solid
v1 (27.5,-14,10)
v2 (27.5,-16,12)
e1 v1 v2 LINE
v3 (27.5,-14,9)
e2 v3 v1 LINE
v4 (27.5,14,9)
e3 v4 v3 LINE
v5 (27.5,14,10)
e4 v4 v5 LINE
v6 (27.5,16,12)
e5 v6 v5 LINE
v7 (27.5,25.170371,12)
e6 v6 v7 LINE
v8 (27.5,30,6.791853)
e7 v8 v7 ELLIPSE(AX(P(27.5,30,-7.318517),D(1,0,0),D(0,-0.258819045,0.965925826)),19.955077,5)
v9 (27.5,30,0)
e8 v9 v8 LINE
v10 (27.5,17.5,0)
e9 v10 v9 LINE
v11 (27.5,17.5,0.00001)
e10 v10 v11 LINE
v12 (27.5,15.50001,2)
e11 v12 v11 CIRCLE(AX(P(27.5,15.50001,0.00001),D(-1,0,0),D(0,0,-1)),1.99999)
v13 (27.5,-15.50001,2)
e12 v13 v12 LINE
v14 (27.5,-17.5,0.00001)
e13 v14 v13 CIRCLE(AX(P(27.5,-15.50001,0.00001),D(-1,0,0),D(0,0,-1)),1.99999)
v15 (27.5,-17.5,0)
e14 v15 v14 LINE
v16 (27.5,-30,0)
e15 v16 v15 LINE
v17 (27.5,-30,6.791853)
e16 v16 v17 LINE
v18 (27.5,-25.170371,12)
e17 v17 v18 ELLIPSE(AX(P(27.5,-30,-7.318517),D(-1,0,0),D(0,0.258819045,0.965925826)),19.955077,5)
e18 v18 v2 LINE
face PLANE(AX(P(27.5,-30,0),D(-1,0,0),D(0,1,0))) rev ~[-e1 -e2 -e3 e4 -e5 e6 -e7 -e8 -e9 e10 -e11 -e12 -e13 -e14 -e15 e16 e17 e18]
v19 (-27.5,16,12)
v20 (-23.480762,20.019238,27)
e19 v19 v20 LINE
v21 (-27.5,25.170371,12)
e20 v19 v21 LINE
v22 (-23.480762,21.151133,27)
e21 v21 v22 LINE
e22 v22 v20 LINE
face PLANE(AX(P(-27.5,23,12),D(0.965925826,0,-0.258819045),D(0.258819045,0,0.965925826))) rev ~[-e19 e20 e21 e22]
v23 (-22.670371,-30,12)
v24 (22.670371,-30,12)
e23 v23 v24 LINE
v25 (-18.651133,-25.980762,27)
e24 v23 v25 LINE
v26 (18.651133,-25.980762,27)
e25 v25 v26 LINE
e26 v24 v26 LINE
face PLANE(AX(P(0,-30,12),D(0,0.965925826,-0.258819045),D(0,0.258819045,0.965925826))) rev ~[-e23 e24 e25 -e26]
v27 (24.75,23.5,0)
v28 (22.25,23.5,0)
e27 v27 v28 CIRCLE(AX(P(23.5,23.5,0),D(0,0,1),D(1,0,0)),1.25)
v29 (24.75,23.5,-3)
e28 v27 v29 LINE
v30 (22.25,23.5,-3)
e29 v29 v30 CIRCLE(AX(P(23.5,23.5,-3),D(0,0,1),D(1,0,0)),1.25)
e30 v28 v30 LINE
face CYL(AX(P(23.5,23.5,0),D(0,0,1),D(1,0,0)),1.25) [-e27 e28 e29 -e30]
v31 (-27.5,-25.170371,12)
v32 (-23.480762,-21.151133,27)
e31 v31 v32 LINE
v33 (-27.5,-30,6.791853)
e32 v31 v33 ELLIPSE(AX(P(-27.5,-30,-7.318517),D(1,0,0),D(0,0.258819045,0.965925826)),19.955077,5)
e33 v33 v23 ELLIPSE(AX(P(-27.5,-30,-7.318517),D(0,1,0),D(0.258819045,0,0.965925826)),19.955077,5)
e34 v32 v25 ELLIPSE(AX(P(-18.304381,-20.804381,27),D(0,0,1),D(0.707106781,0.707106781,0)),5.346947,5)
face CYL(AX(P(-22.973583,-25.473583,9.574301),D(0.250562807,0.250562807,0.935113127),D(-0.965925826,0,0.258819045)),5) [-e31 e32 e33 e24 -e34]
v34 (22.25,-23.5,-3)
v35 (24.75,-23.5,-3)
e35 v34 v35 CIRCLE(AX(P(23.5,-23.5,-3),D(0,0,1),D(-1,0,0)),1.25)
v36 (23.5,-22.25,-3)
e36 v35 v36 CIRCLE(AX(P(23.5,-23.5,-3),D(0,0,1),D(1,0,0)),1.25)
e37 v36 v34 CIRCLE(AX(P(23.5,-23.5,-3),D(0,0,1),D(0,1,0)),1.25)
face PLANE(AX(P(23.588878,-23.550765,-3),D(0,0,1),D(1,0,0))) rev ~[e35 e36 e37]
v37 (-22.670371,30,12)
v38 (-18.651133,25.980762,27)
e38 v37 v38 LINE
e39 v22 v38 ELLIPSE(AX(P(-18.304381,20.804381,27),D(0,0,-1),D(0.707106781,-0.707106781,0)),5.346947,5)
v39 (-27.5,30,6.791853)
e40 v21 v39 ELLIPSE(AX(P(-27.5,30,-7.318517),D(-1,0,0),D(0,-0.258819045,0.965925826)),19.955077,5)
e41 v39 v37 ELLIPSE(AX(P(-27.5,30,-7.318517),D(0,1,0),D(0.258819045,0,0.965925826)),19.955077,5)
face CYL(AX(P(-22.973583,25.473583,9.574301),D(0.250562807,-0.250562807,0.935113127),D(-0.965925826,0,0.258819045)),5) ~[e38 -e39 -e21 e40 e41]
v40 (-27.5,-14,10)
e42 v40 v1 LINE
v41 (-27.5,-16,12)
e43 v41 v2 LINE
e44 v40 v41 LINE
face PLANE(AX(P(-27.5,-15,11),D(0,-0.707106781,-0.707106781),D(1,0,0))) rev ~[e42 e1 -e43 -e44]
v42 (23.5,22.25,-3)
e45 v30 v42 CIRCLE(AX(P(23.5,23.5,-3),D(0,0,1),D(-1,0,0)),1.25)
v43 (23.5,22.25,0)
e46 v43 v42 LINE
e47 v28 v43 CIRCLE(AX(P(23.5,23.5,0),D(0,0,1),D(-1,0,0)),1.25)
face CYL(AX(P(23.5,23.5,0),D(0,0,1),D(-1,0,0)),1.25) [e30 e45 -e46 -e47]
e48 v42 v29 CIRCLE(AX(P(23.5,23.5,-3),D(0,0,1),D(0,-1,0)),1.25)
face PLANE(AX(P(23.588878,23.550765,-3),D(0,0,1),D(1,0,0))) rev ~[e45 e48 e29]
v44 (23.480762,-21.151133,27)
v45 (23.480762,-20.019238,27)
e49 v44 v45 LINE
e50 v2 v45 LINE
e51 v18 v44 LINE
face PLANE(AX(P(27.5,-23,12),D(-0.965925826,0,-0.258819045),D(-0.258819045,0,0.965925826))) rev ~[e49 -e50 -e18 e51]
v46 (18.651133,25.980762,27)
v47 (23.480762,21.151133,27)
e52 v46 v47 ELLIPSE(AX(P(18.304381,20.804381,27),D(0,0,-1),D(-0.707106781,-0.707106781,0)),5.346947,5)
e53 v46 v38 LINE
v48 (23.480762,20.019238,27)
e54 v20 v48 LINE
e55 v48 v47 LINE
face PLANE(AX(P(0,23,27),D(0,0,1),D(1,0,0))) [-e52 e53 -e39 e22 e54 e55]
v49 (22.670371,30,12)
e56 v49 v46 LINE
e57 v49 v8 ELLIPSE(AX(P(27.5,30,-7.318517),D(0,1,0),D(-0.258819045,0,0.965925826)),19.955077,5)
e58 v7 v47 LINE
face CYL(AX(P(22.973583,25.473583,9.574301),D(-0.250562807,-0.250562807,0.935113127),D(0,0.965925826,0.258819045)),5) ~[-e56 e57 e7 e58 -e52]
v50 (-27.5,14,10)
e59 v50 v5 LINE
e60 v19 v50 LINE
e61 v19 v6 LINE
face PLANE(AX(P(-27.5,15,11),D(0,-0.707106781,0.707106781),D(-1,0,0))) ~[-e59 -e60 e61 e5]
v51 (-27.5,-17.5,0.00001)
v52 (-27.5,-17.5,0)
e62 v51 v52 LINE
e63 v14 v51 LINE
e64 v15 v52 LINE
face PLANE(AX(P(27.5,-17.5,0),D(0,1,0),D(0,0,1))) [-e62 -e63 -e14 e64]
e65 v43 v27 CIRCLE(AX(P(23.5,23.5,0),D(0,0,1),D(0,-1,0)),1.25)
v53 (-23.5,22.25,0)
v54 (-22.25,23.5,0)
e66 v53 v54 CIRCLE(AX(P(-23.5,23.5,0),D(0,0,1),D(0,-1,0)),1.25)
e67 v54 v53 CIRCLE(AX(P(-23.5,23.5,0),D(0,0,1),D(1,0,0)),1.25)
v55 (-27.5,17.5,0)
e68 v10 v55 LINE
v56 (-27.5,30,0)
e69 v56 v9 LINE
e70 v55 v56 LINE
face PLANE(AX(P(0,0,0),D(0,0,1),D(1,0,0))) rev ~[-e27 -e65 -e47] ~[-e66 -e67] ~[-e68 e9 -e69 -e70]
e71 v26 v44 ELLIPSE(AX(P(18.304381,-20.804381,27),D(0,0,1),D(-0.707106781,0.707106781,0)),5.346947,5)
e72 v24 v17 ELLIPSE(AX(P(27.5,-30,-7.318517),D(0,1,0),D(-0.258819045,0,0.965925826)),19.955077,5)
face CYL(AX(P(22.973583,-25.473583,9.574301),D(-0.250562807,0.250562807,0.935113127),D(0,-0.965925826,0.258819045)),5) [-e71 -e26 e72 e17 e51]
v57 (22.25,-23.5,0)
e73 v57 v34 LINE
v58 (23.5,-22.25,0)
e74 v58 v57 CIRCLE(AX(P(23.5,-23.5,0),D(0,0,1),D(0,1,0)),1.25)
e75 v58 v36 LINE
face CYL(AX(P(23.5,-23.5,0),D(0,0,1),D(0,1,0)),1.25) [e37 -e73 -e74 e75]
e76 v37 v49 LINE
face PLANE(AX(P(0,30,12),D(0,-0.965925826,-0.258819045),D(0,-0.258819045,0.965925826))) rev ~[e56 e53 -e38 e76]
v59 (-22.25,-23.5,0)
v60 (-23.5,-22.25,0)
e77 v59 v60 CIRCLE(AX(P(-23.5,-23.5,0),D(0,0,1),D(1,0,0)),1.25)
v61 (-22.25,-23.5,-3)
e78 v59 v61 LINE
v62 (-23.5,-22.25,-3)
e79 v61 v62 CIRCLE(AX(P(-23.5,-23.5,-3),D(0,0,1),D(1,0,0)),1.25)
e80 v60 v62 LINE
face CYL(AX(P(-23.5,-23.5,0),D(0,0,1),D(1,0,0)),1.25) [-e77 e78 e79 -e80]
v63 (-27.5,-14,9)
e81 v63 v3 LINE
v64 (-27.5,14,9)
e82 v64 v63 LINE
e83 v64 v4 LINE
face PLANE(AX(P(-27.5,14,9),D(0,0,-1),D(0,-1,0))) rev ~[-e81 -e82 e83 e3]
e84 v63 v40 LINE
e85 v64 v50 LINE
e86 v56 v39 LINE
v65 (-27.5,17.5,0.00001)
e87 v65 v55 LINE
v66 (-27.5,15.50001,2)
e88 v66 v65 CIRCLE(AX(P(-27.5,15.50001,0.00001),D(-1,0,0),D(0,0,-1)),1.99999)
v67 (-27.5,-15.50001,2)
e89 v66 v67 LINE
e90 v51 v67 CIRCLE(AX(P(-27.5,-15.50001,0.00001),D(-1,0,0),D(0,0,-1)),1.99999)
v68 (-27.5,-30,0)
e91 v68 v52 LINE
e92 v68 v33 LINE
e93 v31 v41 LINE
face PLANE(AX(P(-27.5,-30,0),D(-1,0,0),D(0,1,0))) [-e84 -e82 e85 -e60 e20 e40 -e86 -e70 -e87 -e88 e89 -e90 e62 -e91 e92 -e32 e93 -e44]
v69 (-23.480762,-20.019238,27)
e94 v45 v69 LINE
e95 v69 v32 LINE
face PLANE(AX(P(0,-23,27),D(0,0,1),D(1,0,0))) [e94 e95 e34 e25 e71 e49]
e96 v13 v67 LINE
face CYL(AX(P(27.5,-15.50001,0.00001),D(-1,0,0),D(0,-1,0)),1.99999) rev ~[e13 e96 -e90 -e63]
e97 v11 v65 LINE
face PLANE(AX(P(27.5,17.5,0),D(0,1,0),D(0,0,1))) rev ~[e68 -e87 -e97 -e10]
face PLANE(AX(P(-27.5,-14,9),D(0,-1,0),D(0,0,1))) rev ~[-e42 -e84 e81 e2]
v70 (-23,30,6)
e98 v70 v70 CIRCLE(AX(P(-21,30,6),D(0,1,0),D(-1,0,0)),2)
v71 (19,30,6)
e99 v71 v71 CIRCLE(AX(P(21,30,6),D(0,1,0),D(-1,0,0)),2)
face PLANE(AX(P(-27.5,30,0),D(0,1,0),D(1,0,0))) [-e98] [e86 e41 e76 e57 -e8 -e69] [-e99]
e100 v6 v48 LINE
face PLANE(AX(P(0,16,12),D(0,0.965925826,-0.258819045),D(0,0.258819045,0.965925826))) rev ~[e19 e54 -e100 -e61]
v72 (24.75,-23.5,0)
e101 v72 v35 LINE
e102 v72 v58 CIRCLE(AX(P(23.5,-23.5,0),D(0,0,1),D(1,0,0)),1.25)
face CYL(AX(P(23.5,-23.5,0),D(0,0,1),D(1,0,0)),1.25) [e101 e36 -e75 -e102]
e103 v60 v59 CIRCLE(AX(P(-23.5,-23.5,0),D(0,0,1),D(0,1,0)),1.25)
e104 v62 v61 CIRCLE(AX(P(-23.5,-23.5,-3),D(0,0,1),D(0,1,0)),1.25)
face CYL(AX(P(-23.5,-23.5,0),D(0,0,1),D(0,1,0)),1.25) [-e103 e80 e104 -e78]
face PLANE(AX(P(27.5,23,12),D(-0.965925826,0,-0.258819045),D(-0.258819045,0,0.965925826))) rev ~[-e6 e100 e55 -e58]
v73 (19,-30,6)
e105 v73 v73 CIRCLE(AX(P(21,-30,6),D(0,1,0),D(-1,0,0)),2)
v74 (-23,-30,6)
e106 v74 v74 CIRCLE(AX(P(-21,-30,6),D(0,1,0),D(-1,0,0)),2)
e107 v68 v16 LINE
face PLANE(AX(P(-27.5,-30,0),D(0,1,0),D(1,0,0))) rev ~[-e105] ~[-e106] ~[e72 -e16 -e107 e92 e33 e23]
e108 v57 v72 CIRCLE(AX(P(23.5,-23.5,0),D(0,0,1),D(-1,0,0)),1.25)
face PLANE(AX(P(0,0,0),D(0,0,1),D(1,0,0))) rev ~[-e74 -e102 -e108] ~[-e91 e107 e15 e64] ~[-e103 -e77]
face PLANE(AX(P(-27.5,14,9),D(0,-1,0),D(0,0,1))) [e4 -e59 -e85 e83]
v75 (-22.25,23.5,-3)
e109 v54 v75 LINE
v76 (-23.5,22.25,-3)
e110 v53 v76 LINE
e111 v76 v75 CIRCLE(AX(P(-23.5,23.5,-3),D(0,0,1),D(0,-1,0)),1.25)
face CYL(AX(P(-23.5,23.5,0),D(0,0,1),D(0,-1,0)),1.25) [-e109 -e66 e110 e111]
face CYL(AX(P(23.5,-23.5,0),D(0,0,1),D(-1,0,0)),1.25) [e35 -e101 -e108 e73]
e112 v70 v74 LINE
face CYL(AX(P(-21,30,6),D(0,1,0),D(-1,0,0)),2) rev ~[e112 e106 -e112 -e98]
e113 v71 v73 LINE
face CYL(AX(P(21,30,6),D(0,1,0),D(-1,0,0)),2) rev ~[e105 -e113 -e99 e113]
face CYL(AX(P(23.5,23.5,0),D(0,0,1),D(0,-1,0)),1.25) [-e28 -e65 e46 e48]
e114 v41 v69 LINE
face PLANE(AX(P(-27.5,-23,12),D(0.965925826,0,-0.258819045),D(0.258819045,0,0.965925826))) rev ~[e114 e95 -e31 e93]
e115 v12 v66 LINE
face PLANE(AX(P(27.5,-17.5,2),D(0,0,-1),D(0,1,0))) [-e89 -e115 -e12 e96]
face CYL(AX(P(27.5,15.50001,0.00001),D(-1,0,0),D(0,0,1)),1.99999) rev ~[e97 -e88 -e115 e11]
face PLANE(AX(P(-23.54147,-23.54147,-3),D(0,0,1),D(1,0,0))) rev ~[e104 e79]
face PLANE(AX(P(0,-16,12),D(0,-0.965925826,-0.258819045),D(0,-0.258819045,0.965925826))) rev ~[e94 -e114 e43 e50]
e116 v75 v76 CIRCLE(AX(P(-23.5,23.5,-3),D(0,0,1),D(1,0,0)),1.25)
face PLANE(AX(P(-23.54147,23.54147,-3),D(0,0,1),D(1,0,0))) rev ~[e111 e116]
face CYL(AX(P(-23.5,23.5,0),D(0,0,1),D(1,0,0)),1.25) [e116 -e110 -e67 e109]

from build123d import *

# Parameters (mm, degrees)
F0_W      = 55
F0_H      = 60
F1_DEPTH  = 12
F2_DEPTH  = 3
F3_W      = 35
F3_H      = 2
F4_DEPTH  = 56.75
F5_R      = 1.99999
F6_R      = 2
F7_DEPTH  = 63.75
F8_W      = 28
F8_H      = 3
F9_DEPTH  = 57.25
F10_SIZE  = 2
F9_FACE_W = 55
F9_FACE_H = 14
F11_DEPTH = 15
F11_TAPER = 15
F12_R     = 5


# Not quite as in the source:
# - a fillet or chamfer is up to 0.001 mm smaller than in the source, because OpenCascade refuses the exact size


with BuildPart() as f1:
    # F0 (on Top) → F1 (new body)
    with BuildSketch(Plane.XY):
        Rectangle(F0_W, F0_H)
        with BuildLine():
            ThreePointArc((-23.5, 22.25), (-24.3838834765, 24.3838834765), (-22.25, 23.5))
            Line((-22.25, 23.5), (22.25, 23.5))
            ThreePointArc((22.25, 23.5), (23.5, 24.75), (24.75, 23.5))
            ThreePointArc((24.75, 23.5), (24.3838834765, 22.6161165235), (23.5, 22.25))
            Line((23.5, 22.25), (23.5, -22.25))
            ThreePointArc((23.5, -22.25), (24.3838834765, -22.6161165235), (24.75, -23.5))
            ThreePointArc((24.75, -23.5), (23.5, -24.75), (22.25, -23.5))
            Line((22.25, -23.5), (-22.25, -23.5))
            ThreePointArc((-22.25, -23.5), (-24.3838834765, -24.3838834765), (-23.5, -22.25))
            Line((-23.5, -22.25), (-23.5, 22.25))
        make_face(mode=Mode.SUBTRACT)
        with BuildLine():
            Line((22.25, 23.5), (-22.25, 23.5))
            ThreePointArc((-22.25, 23.5), (-22.6161165235, 22.6161165235), (-23.5, 22.25))
            Line((-23.5, 22.25), (-23.5, -22.25))
            ThreePointArc((-23.5, -22.25), (-22.6161165235, -22.6161165235), (-22.25, -23.5))
            Line((-22.25, -23.5), (22.25, -23.5))
            ThreePointArc((22.25, -23.5), (22.6161165235, -22.6161165235), (23.5, -22.25))
            Line((23.5, -22.25), (23.5, 22.25))
            ThreePointArc((23.5, 22.25), (22.6161165235, 22.6161165235), (22.25, 23.5))
        make_face()
        with BuildLine():
            Line((-23.5, 22.25), (-23.5, 23.5))
            Line((-23.5, 23.5), (-22.25, 23.5))
            ThreePointArc((-22.25, 23.5), (-24.3838834765, 24.3838834765), (-23.5, 22.25))
        make_face()
        with BuildLine():
            Line((-22.25, 23.5), (-23.5, 23.5))
            Line((-23.5, 23.5), (-23.5, 22.25))
            ThreePointArc((-23.5, 22.25), (-22.6161165235, 22.6161165235), (-22.25, 23.5))
        make_face()
        with BuildLine():
            ThreePointArc((24.75, 23.5), (23.5, 24.75), (22.25, 23.5))
            Line((22.25, 23.5), (23.5, 23.5))
            Line((23.5, 23.5), (23.5, 22.25))
            ThreePointArc((23.5, 22.25), (24.3838834765, 22.6161165235), (24.75, 23.5))
        make_face()
        with BuildLine():
            Line((23.5, 23.5), (22.25, 23.5))
            ThreePointArc((22.25, 23.5), (22.6161165235, 22.6161165235), (23.5, 22.25))
            Line((23.5, 22.25), (23.5, 23.5))
        make_face()
        with BuildLine():
            ThreePointArc((24.75, -23.5), (24.3838834765, -22.6161165235), (23.5, -22.25))
            Line((23.5, -22.25), (23.5, -23.5))
            Line((23.5, -23.5), (22.25, -23.5))
            ThreePointArc((22.25, -23.5), (23.5, -24.75), (24.75, -23.5))
        make_face()
        with BuildLine():
            Line((23.5, -23.5), (23.5, -22.25))
            ThreePointArc((23.5, -22.25), (22.6161165235, -22.6161165235), (22.25, -23.5))
            Line((22.25, -23.5), (23.5, -23.5))
        make_face()
        with BuildLine():
            Line((-23.5, -23.5), (-23.5, -22.25))
            ThreePointArc((-23.5, -22.25), (-24.3838834765, -24.3838834765), (-22.25, -23.5))
            Line((-22.25, -23.5), (-23.5, -23.5))
        make_face()
        with BuildLine():
            ThreePointArc((-22.25, -23.5), (-22.6161165235, -22.6161165235), (-23.5, -22.25))
            Line((-23.5, -22.25), (-23.5, -23.5))
            Line((-23.5, -23.5), (-22.25, -23.5))
        make_face()
    extrude(amount=F1_DEPTH)

    # F0 (on Top) → F2 (join)
    with BuildSketch(Plane.XY):
        with BuildLine():
            Line((-23.5, 22.25), (-23.5, 23.5))
            Line((-23.5, 23.5), (-22.25, 23.5))
            ThreePointArc((-22.25, 23.5), (-24.3838834765, 24.3838834765), (-23.5, 22.25))
        make_face()
        with BuildLine():
            Line((-22.25, 23.5), (-23.5, 23.5))
            Line((-23.5, 23.5), (-23.5, 22.25))
            ThreePointArc((-23.5, 22.25), (-22.6161165235, 22.6161165235), (-22.25, 23.5))
        make_face()
        with BuildLine():
            Line((-23.5, -23.5), (-23.5, -22.25))
            ThreePointArc((-23.5, -22.25), (-24.3838834765, -24.3838834765), (-22.25, -23.5))
            Line((-22.25, -23.5), (-23.5, -23.5))
        make_face()
        with BuildLine():
            ThreePointArc((-22.25, -23.5), (-22.6161165235, -22.6161165235), (-23.5, -22.25))
            Line((-23.5, -22.25), (-23.5, -23.5))
            Line((-23.5, -23.5), (-22.25, -23.5))
        make_face()
        with BuildLine():
            ThreePointArc((24.75, -23.5), (24.3838834765, -22.6161165235), (23.5, -22.25))
            Line((23.5, -22.25), (23.5, -23.5))
            Line((23.5, -23.5), (22.25, -23.5))
            ThreePointArc((22.25, -23.5), (23.5, -24.75), (24.75, -23.5))
        make_face()
        with BuildLine():
            Line((23.5, -23.5), (23.5, -22.25))
            ThreePointArc((23.5, -22.25), (22.6161165235, -22.6161165235), (22.25, -23.5))
            Line((22.25, -23.5), (23.5, -23.5))
        make_face()
        with BuildLine():
            ThreePointArc((24.75, 23.5), (23.5, 24.75), (22.25, 23.5))
            Line((22.25, 23.5), (23.5, 23.5))
            Line((23.5, 23.5), (23.5, 22.25))
            ThreePointArc((23.5, 22.25), (24.3838834765, 22.6161165235), (24.75, 23.5))
        make_face()
        with BuildLine():
            Line((23.5, 23.5), (22.25, 23.5))
            ThreePointArc((22.25, 23.5), (22.6161165235, 22.6161165235), (23.5, 22.25))
            Line((23.5, 22.25), (23.5, 23.5))
        make_face()
    extrude(amount=-F2_DEPTH)

    # F3 (on face) → F4 (cut)
    with BuildSketch(Plane.YZ.offset(27.5)):
        with Locations((0, 1)):
            Rectangle(F3_W, F3_H)
    extrude(amount=-F4_DEPTH, mode=Mode.SUBTRACT)

    # F5 (radius 2 in the source; OpenCascade refuses exactly that, so slightly less here)
    f5_edges = [f1.edges().sort_by_distance(p)[0] for p in [
        (0, -17.5, 2),
        (0, 17.5, 2),
    ]]
    fillet(f5_edges, radius=F5_R)

    # F6 (on face) → F7 (cut)
    with BuildSketch(Plane(origin=(0, 30, 0), x_dir=(-1, 0, 0), z_dir=(0, 1, 0))):
        with Locations((-21, 6)):
            Circle(F6_R)
        with Locations((21, 6)):
            Circle(F6_R)
    extrude(amount=-F7_DEPTH, mode=Mode.SUBTRACT)

    # F8 (on face) → F9 (cut)
    with BuildSketch(Plane(origin=(-27.5, 0, 0), x_dir=(0, -1, 0), z_dir=(-1, 0, 0))):
        with Locations((0, 10.5)):
            Rectangle(F8_W, F8_H)
    extrude(amount=-F9_DEPTH, mode=Mode.SUBTRACT)

    # F10
    f10_edges = [f1.edges().sort_by_distance(p)[0] for p in [
        (0, -14, 12),
        (0, 14, 12),
    ]]
    chamfer(f10_edges, length=F10_SIZE)

    # F9_face (on face) → F11 (join)
    with BuildSketch(Plane(origin=(0, 23, 12), x_dir=(1, 0, 0), z_dir=(0, 0, 1))):
        Rectangle(F9_FACE_W, F9_FACE_H)
        with Locations((0, -46)):
            Rectangle(F9_FACE_W, F9_FACE_H)
    extrude(amount=F11_DEPTH, taper=F11_TAPER)

    # F12
    f12_edges = [f1.edges().sort_by_distance(p)[0] for p in [
        (-25.490381, 27.990381, 19.5),
        (25.490381, 27.990381, 19.5),
        (-25.490381, -27.990381, 19.5),
        (25.490381, -27.990381, 19.5),
    ]]
    fillet(f12_edges, radius=F12_R)


solid = f1.part
